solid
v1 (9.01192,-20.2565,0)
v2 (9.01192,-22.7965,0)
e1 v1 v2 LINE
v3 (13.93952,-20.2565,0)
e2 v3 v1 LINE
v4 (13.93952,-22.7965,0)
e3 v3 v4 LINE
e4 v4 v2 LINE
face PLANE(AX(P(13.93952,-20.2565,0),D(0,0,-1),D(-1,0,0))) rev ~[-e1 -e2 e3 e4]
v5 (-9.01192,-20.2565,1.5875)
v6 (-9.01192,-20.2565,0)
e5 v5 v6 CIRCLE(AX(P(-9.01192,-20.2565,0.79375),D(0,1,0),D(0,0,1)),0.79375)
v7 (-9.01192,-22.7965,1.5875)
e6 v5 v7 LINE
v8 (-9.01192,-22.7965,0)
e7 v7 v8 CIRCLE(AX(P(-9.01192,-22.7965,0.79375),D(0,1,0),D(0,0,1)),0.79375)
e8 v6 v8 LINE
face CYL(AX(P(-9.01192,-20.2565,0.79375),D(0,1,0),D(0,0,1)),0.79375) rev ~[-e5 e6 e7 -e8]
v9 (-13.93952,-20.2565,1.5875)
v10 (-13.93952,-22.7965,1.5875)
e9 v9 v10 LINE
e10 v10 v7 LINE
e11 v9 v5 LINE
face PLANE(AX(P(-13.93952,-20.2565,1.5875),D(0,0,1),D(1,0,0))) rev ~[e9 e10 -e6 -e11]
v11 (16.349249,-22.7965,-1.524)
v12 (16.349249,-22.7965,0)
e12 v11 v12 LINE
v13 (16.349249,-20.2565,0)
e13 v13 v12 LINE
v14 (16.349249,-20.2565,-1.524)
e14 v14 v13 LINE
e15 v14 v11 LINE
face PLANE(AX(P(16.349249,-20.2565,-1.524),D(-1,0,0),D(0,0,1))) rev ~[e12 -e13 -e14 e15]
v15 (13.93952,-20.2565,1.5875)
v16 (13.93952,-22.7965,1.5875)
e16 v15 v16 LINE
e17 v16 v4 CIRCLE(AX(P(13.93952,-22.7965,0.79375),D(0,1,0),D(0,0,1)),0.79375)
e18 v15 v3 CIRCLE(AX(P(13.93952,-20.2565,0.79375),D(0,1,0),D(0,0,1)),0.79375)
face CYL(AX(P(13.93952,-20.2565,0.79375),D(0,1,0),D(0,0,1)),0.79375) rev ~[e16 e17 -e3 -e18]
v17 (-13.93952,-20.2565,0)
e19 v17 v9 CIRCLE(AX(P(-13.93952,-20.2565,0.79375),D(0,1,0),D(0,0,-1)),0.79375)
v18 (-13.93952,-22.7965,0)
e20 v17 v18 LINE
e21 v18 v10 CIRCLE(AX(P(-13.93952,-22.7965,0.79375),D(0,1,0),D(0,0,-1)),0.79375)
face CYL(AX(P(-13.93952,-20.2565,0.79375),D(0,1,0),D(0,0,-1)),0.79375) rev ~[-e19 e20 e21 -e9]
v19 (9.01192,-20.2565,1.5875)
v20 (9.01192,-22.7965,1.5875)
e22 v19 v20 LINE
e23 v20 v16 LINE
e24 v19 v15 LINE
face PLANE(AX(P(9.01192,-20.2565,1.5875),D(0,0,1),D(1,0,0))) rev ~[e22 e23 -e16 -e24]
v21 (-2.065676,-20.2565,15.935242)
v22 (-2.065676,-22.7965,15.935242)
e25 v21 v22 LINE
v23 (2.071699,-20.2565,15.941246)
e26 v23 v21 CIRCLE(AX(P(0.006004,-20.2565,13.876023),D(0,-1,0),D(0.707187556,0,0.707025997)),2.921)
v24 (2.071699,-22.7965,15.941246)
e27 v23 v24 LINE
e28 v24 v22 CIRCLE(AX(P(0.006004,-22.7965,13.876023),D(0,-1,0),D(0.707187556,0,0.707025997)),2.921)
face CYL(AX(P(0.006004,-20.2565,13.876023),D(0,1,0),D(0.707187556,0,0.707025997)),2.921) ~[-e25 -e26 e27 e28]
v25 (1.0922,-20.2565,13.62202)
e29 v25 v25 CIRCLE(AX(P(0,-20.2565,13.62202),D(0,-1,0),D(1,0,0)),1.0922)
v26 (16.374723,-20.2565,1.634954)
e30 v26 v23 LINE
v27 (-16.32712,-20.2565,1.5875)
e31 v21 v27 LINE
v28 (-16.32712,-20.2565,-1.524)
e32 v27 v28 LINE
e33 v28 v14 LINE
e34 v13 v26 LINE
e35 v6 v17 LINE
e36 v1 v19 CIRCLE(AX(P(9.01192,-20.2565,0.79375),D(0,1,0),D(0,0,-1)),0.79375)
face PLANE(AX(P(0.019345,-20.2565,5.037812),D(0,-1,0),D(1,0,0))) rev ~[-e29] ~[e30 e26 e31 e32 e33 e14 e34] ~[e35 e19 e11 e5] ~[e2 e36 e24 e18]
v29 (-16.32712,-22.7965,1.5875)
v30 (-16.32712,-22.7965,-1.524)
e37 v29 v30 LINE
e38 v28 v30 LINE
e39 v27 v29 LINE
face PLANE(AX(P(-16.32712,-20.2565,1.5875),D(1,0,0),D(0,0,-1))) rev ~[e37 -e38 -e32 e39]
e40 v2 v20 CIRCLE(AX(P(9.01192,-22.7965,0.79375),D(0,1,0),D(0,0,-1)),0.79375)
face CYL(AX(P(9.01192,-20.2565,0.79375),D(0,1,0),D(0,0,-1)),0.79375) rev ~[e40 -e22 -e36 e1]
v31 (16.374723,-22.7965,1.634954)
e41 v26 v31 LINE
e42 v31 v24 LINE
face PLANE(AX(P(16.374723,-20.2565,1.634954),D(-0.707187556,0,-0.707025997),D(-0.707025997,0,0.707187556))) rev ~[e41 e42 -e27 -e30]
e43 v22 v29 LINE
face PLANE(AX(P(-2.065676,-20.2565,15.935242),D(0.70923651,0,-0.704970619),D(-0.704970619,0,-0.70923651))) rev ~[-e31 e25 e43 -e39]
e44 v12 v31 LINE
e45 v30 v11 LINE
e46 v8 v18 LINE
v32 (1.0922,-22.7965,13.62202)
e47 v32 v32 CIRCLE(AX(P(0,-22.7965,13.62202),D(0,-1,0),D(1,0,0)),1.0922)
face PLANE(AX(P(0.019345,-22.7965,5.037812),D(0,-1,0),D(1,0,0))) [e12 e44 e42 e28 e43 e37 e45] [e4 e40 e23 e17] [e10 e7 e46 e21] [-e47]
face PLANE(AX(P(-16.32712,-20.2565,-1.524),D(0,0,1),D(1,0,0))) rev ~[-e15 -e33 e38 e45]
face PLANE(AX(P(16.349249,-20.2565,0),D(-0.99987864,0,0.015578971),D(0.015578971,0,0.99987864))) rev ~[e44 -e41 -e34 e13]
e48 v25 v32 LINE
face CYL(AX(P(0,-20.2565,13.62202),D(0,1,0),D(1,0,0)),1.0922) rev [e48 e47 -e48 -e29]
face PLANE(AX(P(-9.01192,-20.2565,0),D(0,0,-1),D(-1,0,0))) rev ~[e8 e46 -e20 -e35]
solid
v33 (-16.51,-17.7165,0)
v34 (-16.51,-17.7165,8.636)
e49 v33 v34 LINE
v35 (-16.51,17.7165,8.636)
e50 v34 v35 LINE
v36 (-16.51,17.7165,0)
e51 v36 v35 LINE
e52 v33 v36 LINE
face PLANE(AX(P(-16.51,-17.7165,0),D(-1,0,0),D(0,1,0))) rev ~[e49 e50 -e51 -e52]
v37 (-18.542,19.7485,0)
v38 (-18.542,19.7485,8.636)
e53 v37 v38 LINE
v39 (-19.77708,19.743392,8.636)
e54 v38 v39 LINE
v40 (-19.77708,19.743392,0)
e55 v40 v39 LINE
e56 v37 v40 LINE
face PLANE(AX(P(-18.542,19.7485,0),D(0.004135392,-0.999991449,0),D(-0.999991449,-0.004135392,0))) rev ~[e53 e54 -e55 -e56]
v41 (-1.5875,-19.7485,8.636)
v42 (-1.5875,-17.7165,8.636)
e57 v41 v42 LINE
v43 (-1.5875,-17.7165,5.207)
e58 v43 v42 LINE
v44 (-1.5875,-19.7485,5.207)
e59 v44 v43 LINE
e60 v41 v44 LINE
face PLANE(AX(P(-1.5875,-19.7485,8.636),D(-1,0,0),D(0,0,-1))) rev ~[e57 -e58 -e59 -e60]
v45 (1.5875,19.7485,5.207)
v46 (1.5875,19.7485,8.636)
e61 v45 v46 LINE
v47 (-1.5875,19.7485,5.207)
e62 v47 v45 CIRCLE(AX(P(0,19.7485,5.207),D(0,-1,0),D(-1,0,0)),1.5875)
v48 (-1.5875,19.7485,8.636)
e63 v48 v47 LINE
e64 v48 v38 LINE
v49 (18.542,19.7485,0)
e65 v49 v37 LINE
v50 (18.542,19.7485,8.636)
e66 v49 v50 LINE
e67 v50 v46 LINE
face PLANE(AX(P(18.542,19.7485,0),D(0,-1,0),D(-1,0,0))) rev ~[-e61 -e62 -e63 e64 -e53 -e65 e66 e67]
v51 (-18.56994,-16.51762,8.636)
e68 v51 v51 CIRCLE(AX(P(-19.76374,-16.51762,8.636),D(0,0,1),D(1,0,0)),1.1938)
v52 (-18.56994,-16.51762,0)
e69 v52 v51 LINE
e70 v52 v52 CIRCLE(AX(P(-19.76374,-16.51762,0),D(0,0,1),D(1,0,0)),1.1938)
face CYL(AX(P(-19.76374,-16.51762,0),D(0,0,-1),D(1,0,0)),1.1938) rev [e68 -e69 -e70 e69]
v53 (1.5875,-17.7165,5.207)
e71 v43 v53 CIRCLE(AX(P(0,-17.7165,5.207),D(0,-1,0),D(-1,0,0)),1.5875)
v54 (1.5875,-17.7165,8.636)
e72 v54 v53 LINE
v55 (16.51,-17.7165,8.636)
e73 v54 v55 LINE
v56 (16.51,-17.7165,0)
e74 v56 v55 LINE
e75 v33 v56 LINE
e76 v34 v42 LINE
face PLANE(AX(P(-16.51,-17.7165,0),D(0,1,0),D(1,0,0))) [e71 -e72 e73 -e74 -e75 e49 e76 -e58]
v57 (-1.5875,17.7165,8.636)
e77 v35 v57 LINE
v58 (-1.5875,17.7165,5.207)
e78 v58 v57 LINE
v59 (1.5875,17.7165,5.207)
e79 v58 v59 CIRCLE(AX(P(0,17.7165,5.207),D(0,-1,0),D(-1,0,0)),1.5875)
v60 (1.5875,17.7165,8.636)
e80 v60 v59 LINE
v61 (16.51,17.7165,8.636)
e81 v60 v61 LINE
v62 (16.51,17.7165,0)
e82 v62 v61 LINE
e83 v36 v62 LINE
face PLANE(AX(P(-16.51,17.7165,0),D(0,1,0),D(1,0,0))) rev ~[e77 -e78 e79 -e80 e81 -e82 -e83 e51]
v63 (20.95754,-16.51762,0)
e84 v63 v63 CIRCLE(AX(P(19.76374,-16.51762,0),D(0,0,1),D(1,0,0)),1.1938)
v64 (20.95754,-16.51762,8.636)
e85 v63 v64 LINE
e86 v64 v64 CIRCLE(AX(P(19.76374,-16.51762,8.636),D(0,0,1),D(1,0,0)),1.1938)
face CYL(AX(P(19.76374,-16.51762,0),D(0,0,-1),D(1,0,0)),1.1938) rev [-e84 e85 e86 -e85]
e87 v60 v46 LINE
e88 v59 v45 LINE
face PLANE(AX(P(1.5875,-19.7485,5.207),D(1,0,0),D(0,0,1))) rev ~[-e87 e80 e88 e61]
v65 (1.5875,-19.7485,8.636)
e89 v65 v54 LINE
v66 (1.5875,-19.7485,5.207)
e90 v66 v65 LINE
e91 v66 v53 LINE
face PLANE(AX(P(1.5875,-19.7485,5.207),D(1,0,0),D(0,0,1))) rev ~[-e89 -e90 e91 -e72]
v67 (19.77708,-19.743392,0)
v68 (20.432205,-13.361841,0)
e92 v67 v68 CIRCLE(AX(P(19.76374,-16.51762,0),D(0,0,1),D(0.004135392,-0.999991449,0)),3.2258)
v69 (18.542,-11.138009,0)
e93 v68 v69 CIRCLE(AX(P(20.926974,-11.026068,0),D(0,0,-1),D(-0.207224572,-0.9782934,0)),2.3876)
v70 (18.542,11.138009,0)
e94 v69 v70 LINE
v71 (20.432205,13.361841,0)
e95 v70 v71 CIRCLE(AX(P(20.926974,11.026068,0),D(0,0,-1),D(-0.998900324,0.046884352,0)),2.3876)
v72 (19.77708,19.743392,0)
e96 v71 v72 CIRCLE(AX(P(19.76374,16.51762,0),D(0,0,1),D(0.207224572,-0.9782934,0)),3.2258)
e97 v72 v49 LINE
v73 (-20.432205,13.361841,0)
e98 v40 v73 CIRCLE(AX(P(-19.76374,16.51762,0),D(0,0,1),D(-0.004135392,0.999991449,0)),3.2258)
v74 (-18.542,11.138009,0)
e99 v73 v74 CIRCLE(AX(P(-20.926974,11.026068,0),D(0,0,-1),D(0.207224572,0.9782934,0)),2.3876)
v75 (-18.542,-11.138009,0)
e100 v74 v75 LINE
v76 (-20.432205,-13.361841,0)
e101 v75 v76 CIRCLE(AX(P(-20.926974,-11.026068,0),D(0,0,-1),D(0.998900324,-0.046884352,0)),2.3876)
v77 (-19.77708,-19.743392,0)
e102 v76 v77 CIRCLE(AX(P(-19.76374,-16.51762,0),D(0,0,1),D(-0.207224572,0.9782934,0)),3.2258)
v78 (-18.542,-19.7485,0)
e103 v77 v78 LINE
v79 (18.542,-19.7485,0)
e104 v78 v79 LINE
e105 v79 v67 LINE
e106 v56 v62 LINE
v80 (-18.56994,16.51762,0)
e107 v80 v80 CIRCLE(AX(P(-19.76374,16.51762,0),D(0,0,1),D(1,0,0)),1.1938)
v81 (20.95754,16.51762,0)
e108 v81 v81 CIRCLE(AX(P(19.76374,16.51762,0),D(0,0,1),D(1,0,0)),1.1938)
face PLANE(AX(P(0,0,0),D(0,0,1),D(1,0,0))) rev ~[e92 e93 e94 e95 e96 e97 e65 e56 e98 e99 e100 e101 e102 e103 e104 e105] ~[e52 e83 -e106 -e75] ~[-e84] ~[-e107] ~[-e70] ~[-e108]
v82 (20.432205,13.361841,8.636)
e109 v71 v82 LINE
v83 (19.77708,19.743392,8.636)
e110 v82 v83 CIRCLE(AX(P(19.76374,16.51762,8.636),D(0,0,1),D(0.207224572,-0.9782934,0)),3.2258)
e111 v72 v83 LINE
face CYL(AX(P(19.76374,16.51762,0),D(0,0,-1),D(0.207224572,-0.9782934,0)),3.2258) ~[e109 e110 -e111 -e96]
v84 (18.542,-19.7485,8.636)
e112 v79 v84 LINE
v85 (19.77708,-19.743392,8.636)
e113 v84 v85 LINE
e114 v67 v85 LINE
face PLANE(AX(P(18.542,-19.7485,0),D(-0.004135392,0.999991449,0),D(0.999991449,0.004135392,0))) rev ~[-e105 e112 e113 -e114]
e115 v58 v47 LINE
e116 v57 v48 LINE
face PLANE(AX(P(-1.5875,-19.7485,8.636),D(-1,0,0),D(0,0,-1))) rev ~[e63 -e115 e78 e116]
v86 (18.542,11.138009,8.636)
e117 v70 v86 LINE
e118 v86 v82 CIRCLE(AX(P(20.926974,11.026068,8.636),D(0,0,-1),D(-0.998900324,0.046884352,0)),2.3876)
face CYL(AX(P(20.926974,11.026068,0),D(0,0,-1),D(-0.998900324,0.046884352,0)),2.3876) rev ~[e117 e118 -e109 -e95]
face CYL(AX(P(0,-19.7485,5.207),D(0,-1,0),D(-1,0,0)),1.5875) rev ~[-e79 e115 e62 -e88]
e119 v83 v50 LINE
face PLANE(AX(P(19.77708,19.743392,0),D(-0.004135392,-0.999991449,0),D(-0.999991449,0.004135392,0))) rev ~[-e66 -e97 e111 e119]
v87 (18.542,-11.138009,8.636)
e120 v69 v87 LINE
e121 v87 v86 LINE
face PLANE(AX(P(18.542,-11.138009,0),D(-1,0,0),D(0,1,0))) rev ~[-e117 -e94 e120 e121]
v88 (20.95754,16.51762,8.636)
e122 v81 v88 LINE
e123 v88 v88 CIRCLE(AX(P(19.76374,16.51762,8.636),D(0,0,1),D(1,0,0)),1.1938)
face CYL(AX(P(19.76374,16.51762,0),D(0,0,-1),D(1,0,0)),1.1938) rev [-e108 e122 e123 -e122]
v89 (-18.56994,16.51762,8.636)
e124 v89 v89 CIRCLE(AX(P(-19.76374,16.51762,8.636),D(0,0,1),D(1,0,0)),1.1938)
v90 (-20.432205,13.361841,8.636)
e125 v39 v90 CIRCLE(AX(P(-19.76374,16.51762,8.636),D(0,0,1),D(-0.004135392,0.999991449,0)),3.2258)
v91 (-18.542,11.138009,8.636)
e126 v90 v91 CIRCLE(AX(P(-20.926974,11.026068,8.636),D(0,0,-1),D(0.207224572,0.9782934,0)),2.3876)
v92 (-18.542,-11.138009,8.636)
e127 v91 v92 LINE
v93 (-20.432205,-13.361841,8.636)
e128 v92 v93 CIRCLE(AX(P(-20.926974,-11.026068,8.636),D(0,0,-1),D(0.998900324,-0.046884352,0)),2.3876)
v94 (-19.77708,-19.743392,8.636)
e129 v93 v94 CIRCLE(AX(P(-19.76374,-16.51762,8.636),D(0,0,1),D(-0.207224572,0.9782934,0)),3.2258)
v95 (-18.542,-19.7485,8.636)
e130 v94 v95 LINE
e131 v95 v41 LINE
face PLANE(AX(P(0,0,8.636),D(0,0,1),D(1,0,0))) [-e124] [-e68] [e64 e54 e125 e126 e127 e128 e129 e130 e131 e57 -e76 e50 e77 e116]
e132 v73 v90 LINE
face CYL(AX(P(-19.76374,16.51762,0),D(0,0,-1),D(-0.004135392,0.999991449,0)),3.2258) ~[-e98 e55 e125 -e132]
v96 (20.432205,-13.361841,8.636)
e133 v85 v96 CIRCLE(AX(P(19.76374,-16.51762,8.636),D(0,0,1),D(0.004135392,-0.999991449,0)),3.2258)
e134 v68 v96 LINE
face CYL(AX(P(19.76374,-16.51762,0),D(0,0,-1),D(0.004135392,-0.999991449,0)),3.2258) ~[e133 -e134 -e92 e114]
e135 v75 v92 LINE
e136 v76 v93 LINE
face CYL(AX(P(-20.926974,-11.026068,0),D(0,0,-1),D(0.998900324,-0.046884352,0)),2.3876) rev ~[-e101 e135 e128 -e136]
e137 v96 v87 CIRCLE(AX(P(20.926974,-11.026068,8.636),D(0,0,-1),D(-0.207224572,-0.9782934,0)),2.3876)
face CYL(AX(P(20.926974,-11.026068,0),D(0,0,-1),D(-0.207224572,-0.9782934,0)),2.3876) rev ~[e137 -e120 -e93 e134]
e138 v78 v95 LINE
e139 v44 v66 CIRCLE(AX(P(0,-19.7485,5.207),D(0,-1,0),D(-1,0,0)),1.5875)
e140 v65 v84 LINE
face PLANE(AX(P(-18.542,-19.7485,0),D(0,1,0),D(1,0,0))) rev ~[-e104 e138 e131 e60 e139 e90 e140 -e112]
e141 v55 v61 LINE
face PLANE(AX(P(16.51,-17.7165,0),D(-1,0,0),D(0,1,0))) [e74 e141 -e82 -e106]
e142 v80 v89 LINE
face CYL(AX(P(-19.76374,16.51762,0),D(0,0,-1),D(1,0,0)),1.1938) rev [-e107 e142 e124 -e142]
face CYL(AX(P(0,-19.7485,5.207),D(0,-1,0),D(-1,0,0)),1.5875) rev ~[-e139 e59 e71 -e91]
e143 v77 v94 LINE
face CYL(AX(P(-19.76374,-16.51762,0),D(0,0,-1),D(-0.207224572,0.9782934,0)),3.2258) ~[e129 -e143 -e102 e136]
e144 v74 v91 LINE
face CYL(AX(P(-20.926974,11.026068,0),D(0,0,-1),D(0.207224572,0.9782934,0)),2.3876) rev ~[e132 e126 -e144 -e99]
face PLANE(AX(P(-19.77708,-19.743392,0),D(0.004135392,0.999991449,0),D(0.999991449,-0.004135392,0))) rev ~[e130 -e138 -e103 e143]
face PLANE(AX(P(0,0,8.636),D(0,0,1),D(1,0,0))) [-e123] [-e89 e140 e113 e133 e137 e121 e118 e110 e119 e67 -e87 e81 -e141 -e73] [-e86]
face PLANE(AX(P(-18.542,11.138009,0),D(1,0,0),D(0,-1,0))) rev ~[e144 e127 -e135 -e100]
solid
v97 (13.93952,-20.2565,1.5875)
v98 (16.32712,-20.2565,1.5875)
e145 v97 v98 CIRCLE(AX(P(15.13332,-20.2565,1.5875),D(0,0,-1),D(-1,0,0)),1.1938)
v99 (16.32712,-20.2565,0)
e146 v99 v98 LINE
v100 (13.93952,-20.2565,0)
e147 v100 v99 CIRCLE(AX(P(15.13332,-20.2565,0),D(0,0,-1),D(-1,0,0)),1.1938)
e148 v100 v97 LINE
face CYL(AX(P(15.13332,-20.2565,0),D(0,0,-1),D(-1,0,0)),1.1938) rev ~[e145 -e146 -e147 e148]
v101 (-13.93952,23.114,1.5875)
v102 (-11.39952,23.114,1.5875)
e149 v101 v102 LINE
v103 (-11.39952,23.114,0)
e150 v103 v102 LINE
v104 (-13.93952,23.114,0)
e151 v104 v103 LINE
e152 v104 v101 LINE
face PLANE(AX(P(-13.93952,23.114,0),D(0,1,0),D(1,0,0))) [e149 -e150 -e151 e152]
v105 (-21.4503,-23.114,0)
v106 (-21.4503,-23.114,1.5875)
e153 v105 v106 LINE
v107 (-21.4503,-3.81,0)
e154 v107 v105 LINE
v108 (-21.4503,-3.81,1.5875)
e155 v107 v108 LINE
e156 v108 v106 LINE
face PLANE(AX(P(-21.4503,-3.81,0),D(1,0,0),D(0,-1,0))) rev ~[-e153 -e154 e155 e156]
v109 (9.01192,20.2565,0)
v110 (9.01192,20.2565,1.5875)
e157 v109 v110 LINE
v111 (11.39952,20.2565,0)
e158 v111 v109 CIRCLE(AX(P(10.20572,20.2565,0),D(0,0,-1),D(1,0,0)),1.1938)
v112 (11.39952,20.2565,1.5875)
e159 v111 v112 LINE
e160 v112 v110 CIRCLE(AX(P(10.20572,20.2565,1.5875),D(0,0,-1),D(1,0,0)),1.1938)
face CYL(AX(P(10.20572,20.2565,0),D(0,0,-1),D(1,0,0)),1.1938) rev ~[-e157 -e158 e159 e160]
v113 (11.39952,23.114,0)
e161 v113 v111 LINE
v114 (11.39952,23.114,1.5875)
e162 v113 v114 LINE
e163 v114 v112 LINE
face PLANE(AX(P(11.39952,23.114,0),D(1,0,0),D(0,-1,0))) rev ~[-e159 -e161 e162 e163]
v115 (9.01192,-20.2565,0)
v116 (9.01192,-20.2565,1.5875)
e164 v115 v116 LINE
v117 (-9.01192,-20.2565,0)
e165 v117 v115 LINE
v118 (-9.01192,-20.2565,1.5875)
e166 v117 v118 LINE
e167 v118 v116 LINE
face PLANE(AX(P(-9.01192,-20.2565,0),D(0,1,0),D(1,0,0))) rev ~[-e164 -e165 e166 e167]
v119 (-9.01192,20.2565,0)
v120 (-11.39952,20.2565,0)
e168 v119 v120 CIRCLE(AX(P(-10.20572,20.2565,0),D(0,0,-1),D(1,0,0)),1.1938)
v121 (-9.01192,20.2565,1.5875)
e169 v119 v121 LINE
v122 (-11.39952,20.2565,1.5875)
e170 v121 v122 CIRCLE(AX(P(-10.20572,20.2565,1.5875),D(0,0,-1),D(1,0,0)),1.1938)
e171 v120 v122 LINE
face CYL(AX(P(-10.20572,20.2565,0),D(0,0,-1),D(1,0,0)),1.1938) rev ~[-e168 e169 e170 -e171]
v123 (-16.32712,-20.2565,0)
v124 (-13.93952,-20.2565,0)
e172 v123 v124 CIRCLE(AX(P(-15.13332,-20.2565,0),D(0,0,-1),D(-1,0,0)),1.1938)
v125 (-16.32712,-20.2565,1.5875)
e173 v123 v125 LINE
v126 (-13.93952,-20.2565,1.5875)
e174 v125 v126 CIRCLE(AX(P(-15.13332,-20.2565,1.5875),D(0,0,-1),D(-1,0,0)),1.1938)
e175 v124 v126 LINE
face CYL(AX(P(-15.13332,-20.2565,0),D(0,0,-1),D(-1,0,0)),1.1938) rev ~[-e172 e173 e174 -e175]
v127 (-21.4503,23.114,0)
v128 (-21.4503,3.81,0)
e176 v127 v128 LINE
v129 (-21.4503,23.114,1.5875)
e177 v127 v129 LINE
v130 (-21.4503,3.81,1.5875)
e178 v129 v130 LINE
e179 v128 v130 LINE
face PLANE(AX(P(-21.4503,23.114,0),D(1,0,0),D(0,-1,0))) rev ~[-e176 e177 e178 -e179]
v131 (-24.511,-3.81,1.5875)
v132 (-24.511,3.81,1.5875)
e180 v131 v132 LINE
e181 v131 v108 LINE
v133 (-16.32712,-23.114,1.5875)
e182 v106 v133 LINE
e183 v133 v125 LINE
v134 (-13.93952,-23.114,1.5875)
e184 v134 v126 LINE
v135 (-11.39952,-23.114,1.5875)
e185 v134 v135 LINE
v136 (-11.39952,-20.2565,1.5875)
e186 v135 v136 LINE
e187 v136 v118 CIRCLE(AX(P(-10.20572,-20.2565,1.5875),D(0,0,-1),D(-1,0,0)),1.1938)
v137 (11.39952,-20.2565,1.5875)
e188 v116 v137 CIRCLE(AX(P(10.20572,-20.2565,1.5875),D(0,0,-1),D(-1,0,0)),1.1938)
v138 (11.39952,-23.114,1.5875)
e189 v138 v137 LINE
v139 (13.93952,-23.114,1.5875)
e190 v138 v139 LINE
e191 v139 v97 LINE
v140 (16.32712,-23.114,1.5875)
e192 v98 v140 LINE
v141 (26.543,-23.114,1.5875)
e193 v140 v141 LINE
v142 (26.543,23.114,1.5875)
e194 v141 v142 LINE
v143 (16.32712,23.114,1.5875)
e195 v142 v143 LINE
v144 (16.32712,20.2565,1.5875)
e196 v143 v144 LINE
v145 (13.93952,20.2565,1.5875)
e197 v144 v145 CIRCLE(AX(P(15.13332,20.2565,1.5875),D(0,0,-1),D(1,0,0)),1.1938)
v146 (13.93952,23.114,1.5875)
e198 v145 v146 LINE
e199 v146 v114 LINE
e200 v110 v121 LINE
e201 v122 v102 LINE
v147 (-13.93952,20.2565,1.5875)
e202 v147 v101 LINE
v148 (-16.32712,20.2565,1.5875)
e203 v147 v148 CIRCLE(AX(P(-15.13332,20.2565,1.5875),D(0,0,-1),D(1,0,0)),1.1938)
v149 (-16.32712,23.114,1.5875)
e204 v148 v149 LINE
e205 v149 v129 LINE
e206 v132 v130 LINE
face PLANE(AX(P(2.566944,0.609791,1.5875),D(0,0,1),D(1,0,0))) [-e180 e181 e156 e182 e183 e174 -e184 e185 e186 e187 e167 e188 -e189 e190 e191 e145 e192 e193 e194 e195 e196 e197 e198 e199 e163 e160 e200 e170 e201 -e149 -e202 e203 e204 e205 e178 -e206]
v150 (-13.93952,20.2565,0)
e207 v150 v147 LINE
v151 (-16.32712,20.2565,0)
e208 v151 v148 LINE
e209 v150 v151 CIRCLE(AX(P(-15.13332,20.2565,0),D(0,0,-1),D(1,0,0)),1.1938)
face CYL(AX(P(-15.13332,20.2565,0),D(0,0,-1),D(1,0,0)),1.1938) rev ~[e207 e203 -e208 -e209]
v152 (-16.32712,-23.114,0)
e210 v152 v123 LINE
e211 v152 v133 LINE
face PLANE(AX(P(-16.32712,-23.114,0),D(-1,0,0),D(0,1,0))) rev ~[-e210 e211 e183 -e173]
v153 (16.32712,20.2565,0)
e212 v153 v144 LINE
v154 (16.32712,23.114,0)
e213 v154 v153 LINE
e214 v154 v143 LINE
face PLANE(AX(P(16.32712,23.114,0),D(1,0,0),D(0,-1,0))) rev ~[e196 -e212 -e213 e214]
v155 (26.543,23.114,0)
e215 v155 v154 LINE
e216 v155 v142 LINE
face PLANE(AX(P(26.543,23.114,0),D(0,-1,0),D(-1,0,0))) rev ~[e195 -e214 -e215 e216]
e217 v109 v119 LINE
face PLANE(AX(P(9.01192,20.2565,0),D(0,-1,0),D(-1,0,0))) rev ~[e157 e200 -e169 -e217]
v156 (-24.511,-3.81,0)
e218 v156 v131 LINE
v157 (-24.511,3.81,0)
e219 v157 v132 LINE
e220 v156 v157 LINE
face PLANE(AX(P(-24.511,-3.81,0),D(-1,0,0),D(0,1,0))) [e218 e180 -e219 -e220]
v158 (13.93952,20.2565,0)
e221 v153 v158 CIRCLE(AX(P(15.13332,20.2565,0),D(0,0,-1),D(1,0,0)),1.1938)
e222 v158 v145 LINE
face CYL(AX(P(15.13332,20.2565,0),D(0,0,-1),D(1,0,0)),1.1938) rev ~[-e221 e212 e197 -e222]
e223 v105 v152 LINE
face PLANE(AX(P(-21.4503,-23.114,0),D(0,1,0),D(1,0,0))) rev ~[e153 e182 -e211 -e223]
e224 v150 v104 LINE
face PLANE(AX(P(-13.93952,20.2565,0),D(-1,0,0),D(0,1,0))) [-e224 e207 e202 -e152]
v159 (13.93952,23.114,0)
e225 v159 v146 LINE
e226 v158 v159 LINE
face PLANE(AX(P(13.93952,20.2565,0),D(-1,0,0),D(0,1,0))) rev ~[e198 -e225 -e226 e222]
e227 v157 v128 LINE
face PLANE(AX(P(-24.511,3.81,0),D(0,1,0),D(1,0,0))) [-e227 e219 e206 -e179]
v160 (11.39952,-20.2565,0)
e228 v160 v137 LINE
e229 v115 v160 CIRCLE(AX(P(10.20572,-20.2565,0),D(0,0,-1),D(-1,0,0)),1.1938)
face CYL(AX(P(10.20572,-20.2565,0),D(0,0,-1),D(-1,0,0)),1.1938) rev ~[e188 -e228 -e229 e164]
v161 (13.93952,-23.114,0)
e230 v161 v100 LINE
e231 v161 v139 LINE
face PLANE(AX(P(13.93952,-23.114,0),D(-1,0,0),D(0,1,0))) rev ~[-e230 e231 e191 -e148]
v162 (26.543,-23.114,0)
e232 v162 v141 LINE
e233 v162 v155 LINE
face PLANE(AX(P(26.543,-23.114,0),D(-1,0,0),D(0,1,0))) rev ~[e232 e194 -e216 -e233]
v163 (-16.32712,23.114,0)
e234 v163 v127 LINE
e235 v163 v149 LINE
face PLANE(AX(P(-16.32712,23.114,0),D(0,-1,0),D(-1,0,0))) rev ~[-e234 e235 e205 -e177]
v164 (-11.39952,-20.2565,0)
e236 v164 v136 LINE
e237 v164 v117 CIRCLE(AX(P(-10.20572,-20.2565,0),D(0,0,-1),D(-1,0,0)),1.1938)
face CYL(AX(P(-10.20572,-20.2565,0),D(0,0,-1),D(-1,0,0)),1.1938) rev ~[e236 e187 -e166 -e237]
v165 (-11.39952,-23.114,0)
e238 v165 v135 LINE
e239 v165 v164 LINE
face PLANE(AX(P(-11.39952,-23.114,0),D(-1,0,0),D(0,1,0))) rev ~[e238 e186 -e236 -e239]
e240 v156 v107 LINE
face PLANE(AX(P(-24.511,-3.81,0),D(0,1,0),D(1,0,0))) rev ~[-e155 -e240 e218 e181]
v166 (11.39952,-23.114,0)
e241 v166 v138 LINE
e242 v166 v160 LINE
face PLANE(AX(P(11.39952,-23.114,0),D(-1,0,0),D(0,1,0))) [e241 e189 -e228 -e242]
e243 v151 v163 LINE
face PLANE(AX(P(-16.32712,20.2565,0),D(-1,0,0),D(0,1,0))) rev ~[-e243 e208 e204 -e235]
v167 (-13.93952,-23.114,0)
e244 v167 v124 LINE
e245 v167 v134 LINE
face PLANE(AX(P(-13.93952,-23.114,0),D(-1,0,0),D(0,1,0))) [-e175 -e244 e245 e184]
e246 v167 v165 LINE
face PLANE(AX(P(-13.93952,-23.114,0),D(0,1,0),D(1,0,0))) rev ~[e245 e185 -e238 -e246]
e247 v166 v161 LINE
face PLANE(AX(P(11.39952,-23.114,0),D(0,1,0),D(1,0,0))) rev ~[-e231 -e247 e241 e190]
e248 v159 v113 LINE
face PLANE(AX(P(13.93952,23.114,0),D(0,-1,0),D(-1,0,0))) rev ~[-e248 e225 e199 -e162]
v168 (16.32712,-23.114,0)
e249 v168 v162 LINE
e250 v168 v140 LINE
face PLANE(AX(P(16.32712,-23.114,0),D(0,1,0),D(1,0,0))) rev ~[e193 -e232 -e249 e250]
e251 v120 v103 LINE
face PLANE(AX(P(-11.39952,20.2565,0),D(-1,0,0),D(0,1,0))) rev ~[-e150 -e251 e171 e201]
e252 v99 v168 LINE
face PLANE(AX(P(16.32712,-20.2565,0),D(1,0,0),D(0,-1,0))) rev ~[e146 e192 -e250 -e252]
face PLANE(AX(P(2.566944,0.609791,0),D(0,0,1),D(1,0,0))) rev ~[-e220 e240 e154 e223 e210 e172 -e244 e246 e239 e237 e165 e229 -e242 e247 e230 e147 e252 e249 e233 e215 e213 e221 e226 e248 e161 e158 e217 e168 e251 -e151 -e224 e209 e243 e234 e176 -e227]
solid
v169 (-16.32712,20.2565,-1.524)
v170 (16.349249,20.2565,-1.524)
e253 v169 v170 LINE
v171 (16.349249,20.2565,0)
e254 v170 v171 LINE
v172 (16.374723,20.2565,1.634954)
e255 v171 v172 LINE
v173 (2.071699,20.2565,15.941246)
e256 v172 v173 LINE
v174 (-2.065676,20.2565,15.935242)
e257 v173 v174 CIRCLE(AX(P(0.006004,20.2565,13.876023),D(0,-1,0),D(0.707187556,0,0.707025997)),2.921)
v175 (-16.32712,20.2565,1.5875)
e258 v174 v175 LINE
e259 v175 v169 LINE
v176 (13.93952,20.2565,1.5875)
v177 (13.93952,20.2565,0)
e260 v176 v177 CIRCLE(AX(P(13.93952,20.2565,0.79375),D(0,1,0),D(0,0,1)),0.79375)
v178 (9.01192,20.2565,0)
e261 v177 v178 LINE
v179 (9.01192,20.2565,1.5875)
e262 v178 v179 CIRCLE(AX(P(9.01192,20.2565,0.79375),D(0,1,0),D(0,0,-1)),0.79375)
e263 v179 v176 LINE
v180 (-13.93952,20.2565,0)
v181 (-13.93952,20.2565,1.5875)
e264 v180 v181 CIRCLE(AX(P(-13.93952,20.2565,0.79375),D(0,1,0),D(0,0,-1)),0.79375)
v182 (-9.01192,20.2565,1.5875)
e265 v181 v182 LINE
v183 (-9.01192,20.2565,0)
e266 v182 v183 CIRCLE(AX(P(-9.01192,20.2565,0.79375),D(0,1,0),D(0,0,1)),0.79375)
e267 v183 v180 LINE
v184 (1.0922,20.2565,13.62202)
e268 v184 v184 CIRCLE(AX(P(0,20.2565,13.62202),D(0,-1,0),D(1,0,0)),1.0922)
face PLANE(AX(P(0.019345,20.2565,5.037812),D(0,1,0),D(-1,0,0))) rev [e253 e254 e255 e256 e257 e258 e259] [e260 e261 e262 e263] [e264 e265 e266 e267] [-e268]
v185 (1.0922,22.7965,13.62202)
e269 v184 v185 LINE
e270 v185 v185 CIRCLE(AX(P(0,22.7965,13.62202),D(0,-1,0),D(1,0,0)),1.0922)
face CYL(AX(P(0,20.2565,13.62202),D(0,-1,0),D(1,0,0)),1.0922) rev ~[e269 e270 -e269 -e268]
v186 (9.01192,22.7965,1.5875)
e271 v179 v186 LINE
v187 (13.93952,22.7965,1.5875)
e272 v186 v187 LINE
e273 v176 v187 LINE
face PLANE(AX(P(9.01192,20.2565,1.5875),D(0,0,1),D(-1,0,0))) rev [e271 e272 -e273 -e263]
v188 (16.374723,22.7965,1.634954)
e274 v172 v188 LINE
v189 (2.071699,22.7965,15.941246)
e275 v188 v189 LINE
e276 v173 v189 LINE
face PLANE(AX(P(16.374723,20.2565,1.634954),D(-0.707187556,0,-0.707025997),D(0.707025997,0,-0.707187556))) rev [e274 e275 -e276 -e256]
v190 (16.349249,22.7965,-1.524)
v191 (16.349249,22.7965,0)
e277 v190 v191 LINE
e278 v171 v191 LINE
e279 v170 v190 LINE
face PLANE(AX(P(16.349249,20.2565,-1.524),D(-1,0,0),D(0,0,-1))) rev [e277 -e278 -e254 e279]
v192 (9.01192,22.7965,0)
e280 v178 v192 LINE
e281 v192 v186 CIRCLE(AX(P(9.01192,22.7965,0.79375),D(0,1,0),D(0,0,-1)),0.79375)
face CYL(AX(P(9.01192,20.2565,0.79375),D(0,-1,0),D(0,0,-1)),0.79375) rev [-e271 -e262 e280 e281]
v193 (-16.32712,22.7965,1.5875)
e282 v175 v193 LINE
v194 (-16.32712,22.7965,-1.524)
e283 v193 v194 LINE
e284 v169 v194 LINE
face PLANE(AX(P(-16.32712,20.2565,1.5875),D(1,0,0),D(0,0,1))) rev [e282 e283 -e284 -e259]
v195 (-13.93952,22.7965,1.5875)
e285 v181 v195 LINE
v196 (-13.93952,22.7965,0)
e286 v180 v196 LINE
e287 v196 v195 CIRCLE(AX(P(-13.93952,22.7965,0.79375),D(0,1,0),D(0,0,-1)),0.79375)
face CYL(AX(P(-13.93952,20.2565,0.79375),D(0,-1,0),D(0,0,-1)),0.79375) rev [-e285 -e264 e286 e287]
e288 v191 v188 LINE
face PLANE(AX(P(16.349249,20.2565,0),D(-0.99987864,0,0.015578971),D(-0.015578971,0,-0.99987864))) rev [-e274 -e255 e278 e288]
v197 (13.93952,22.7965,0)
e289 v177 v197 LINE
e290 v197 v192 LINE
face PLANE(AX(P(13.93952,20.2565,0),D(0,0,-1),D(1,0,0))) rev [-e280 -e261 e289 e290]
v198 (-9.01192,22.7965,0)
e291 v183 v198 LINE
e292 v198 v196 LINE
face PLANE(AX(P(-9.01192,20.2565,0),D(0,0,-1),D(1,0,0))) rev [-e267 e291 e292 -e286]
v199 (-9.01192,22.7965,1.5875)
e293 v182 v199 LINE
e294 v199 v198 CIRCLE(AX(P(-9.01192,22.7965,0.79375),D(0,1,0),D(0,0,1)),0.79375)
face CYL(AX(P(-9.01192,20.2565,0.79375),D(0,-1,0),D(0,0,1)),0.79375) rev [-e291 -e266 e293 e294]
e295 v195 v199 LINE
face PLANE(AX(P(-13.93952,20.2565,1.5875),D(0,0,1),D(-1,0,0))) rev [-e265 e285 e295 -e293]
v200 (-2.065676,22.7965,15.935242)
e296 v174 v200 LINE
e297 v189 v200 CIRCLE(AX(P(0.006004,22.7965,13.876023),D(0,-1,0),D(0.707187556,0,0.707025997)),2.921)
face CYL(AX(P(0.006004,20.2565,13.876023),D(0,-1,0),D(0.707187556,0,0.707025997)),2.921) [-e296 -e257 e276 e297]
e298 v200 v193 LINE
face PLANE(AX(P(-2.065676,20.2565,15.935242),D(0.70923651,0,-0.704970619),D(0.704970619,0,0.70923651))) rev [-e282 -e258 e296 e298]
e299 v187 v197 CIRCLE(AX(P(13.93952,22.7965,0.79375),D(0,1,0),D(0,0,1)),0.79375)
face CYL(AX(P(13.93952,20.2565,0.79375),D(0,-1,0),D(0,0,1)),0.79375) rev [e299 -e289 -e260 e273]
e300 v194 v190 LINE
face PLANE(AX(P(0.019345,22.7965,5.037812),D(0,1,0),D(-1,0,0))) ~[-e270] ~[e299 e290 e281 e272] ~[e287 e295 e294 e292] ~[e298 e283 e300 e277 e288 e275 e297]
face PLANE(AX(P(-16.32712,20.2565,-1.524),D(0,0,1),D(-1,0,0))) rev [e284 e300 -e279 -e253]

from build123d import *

# Parameters (mm, degrees)
F0_W     = 3.0607
F0_H     = 7.62
F0_W_2   = 2.54
F0_H_2   = 2.8575
F1_DEPTH = 1.5875
F2_R     = 1.0922
F3_DEPTH = 2.54
F5_W     = 33.02
F5_H     = 35.433
F5_R     = 1.1938
F6_DEPTH = 8.636
F8_DEPTH = 42.8635


with BuildPart() as f1:
    # F0 (on Top) → F1 (new body)
    with BuildSketch(Plane.XY):
        with BuildLine():
            Line((-16.32712, 23.114), (-21.4503, 23.114))
            Line((-21.4503, 23.114), (-21.4503, 3.81))
            Line((-21.4503, 3.81), (-21.4503, -3.81))
            Line((-21.4503, -3.81), (-21.4503, -23.114))
            Line((-21.4503, -23.114), (-16.32712, -23.114))
            Line((-16.32712, -23.114), (-16.32712, -20.2565))
            ThreePointArc((-16.32712, -20.2565), (-15.13332, -19.0627), (-13.93952, -20.2565))
            Line((-13.93952, -20.2565), (-11.39952, -20.2565))
            ThreePointArc((-11.39952, -20.2565), (-10.20572, -19.0627), (-9.01192, -20.2565))
            Line((-9.01192, -20.2565), (9.01192, -20.2565))
            ThreePointArc((9.01192, -20.2565), (10.20572, -19.0627), (11.39952, -20.2565))
            Line((11.39952, -20.2565), (13.93952, -20.2565))
            ThreePointArc((13.93952, -20.2565), (15.13332, -19.0627), (16.32712, -20.2565))
            Line((16.32712, -20.2565), (16.32712, -23.114))
            Line((16.32712, -23.114), (21.4503, -23.114))
            Line((21.4503, -23.114), (26.543, -23.114))
            Line((26.543, -23.114), (26.543, 23.114))
            Line((26.543, 23.114), (21.4503, 23.114))
            Line((21.4503, 23.114), (16.32712, 23.114))
            Line((16.32712, 23.114), (16.32712, 20.2565))
            ThreePointArc((16.32712, 20.2565), (15.13332, 19.0627), (13.93952, 20.2565))
            Line((13.93952, 20.2565), (13.93952, 23.114))
            Line((13.93952, 23.114), (11.39952, 23.114))
            Line((11.39952, 23.114), (11.39952, 20.2565))
            ThreePointArc((11.39952, 20.2565), (10.20572, 19.0627), (9.01192, 20.2565))
            Line((9.01192, 20.2565), (-9.01192, 20.2565))
            ThreePointArc((-9.01192, 20.2565), (-10.20572, 19.0627), (-11.39952, 20.2565))
            Line((-11.39952, 20.2565), (-13.93952, 20.2565))
            ThreePointArc((-13.93952, 20.2565), (-15.13332, 19.0627), (-16.32712, 20.2565))
            Line((-16.32712, 20.2565), (-16.32712, 23.114))
        make_face()
        with Locations((-22.98065, 0)):
            Rectangle(F0_W, F0_H)
        with Locations((-12.66952, 21.68525)):
            Rectangle(F0_W_2, F0_H_2)
        with Locations((-12.66952, -21.68525)):
            Rectangle(F0_W_2, F0_H_2)
        with Locations((12.66952, -21.68525)):
            Rectangle(F0_W_2, F0_H_2)
    extrude(amount=F1_DEPTH)


with BuildPart() as f3:
    # F2 (on face) → F3 (new body)
    with BuildSketch(Plane.XZ.offset(20.2565)):
        with BuildLine():
            Line((-11.39952, 1.5875), (-9.01192, 1.5875))
            ThreePointArc((-9.01192, 1.5875), (-8.21817, 0.79375), (-9.01192, 0))
            Line((-9.01192, 0), (9.01192, 0))
            ThreePointArc((9.01192, 0), (8.21817, 0.79375), (9.01192, 1.5875))
            Line((9.01192, 1.5875), (11.39952, 1.5875))
            Line((11.39952, 1.5875), (13.93952, 1.5875))
            ThreePointArc((13.93952, 1.5875), (14.73327, 0.79375), (13.93952, 0))
            Line((13.93952, 0), (16.32712, 0))
            Line((16.32712, 0), (16.3492485881, 0))
            Line((16.3492485881, 0), (16.3747225774, 1.6349537815))
            Line((16.3747225774, 1.6349537815), (2.0716986414, 15.941246014))
            ThreePointArc((2.0716986414, 15.941246014), (0.0017651203, 16.79702), (-2.0656760542, 15.9352422522))
            Line((-2.0656760542, 15.9352422522), (-16.32712, 1.5875))
            Line((-16.32712, 1.5875), (-16.32712, 0))
            Line((-16.32712, 0), (-13.93952, 0))
            ThreePointArc((-13.93952, 0), (-14.73327, 0.79375), (-13.93952, 1.5875))
            Line((-13.93952, 1.5875), (-11.39952, 1.5875))
        make_face()
        with Locations((0, 13.6220204907)):
            Circle(F2_R, mode=Mode.SUBTRACT)
        Polygon((9.01192, 0), (-9.01192, 0), (-11.39952, 0), (-13.93952, 0), (-16.32712, 0), (-16.32712, -1.524), (16.3492485881, -1.524), (16.3492485881, 0), (16.32712, 0), (13.93952, 0), (11.39952, 0), align=None)
    extrude(amount=F3_DEPTH)


with BuildPart() as f4_1:
    # F4: instance of F3
    add(f3.part.mirror(Plane.XZ))


with BuildPart() as f6:
    # F5 (on Top) → F6 (new body)
    with BuildSketch(Plane.XY):
        Polygon((18.542, 19.7485), (-18.542, 19.7485), (-18.542, 11.1380089074), (-18.542, -11.1380089074), (-18.542, -19.7485), (18.542, -19.7485), (18.542, -11.1380089074), (18.542, 11.1380089074), align=None)
        Rectangle(F5_W, F5_H, mode=Mode.SUBTRACT)
        with BuildLine():
            Line((-18.542, 11.1380089074), (-18.542, 19.7485))
            Line((-18.542, 19.7485), (-19.7770799466, 19.7433924169))
            ThreePointArc((-19.7770799466, 19.7433924169), (-22.972674971, 16.8470467627), (-20.4322050252, 13.36184115))
            ThreePointArc((-20.4322050252, 13.36184115), (-19.1077469534, 12.5723683185), (-18.542, 11.1380089074))
        make_face()
        with Locations((-19.76374, 16.51762)):
            Circle(F5_R, mode=Mode.SUBTRACT)
        with BuildLine():
            Line((19.7770799466, 19.7433924169), (18.542, 19.7485))
            Line((18.542, 19.7485), (18.542, 11.1380089074))
            ThreePointArc((18.542, 11.1380089074), (19.1077469534, 12.5723683185), (20.4322050252, 13.36184115))
            ThreePointArc((20.4322050252, 13.36184115), (22.972674971, 16.8470467627), (19.7770799466, 19.7433924169))
        make_face()
        with Locations((19.76374, 16.51762)):
            Circle(F5_R, mode=Mode.SUBTRACT)
        with BuildLine():
            ThreePointArc((20.4322050252, -13.36184115), (19.1077469534, -12.5723683185), (18.542, -11.1380089074))
            Line((18.542, -11.1380089074), (18.542, -19.7485))
            Line((18.542, -19.7485), (19.7770799466, -19.7433924169))
            ThreePointArc((19.7770799466, -19.7433924169), (22.972674971, -16.8470467627), (20.4322050252, -13.36184115))
        make_face()
        with Locations((19.76374, -16.51762)):
            Circle(F5_R, mode=Mode.SUBTRACT)
        with BuildLine():
            Line((-18.542, -19.7485), (-18.542, -11.1380089074))
            ThreePointArc((-18.542, -11.1380089074), (-19.1077469534, -12.5723683185), (-20.4322050252, -13.36184115))
            ThreePointArc((-20.4322050252, -13.36184115), (-22.972674971, -16.8470467627), (-19.7770799466, -19.7433924169))
            Line((-19.7770799466, -19.7433924169), (-18.542, -19.7485))
        make_face()
        with Locations((-19.76374, -16.51762)):
            Circle(F5_R, mode=Mode.SUBTRACT)
    extrude(amount=F6_DEPTH)

    # F7 (on face) → F8 (cut, through all)
    with BuildSketch(Plane.XZ.offset(19.7485)):
        with BuildLine():
            ThreePointArc((1.5875, 5.207), (0, 6.7945), (-1.5875, 5.207))
            ThreePointArc((-1.5875, 5.207), (0, 3.6195), (1.5875, 5.207))
        make_face()
        with BuildLine():
            Line((1.5875, 8.636), (-1.5875, 8.636))
            Line((-1.5875, 8.636), (-1.5875, 5.207))
            ThreePointArc((-1.5875, 5.207), (0, 6.7945), (1.5875, 5.207))
            Line((1.5875, 5.207), (1.5875, 8.636))
        make_face()
    extrude(amount=-F8_DEPTH, mode=Mode.SUBTRACT)


solid = Compound([f1.part, f3.part, f4_1.part, f6.part])
